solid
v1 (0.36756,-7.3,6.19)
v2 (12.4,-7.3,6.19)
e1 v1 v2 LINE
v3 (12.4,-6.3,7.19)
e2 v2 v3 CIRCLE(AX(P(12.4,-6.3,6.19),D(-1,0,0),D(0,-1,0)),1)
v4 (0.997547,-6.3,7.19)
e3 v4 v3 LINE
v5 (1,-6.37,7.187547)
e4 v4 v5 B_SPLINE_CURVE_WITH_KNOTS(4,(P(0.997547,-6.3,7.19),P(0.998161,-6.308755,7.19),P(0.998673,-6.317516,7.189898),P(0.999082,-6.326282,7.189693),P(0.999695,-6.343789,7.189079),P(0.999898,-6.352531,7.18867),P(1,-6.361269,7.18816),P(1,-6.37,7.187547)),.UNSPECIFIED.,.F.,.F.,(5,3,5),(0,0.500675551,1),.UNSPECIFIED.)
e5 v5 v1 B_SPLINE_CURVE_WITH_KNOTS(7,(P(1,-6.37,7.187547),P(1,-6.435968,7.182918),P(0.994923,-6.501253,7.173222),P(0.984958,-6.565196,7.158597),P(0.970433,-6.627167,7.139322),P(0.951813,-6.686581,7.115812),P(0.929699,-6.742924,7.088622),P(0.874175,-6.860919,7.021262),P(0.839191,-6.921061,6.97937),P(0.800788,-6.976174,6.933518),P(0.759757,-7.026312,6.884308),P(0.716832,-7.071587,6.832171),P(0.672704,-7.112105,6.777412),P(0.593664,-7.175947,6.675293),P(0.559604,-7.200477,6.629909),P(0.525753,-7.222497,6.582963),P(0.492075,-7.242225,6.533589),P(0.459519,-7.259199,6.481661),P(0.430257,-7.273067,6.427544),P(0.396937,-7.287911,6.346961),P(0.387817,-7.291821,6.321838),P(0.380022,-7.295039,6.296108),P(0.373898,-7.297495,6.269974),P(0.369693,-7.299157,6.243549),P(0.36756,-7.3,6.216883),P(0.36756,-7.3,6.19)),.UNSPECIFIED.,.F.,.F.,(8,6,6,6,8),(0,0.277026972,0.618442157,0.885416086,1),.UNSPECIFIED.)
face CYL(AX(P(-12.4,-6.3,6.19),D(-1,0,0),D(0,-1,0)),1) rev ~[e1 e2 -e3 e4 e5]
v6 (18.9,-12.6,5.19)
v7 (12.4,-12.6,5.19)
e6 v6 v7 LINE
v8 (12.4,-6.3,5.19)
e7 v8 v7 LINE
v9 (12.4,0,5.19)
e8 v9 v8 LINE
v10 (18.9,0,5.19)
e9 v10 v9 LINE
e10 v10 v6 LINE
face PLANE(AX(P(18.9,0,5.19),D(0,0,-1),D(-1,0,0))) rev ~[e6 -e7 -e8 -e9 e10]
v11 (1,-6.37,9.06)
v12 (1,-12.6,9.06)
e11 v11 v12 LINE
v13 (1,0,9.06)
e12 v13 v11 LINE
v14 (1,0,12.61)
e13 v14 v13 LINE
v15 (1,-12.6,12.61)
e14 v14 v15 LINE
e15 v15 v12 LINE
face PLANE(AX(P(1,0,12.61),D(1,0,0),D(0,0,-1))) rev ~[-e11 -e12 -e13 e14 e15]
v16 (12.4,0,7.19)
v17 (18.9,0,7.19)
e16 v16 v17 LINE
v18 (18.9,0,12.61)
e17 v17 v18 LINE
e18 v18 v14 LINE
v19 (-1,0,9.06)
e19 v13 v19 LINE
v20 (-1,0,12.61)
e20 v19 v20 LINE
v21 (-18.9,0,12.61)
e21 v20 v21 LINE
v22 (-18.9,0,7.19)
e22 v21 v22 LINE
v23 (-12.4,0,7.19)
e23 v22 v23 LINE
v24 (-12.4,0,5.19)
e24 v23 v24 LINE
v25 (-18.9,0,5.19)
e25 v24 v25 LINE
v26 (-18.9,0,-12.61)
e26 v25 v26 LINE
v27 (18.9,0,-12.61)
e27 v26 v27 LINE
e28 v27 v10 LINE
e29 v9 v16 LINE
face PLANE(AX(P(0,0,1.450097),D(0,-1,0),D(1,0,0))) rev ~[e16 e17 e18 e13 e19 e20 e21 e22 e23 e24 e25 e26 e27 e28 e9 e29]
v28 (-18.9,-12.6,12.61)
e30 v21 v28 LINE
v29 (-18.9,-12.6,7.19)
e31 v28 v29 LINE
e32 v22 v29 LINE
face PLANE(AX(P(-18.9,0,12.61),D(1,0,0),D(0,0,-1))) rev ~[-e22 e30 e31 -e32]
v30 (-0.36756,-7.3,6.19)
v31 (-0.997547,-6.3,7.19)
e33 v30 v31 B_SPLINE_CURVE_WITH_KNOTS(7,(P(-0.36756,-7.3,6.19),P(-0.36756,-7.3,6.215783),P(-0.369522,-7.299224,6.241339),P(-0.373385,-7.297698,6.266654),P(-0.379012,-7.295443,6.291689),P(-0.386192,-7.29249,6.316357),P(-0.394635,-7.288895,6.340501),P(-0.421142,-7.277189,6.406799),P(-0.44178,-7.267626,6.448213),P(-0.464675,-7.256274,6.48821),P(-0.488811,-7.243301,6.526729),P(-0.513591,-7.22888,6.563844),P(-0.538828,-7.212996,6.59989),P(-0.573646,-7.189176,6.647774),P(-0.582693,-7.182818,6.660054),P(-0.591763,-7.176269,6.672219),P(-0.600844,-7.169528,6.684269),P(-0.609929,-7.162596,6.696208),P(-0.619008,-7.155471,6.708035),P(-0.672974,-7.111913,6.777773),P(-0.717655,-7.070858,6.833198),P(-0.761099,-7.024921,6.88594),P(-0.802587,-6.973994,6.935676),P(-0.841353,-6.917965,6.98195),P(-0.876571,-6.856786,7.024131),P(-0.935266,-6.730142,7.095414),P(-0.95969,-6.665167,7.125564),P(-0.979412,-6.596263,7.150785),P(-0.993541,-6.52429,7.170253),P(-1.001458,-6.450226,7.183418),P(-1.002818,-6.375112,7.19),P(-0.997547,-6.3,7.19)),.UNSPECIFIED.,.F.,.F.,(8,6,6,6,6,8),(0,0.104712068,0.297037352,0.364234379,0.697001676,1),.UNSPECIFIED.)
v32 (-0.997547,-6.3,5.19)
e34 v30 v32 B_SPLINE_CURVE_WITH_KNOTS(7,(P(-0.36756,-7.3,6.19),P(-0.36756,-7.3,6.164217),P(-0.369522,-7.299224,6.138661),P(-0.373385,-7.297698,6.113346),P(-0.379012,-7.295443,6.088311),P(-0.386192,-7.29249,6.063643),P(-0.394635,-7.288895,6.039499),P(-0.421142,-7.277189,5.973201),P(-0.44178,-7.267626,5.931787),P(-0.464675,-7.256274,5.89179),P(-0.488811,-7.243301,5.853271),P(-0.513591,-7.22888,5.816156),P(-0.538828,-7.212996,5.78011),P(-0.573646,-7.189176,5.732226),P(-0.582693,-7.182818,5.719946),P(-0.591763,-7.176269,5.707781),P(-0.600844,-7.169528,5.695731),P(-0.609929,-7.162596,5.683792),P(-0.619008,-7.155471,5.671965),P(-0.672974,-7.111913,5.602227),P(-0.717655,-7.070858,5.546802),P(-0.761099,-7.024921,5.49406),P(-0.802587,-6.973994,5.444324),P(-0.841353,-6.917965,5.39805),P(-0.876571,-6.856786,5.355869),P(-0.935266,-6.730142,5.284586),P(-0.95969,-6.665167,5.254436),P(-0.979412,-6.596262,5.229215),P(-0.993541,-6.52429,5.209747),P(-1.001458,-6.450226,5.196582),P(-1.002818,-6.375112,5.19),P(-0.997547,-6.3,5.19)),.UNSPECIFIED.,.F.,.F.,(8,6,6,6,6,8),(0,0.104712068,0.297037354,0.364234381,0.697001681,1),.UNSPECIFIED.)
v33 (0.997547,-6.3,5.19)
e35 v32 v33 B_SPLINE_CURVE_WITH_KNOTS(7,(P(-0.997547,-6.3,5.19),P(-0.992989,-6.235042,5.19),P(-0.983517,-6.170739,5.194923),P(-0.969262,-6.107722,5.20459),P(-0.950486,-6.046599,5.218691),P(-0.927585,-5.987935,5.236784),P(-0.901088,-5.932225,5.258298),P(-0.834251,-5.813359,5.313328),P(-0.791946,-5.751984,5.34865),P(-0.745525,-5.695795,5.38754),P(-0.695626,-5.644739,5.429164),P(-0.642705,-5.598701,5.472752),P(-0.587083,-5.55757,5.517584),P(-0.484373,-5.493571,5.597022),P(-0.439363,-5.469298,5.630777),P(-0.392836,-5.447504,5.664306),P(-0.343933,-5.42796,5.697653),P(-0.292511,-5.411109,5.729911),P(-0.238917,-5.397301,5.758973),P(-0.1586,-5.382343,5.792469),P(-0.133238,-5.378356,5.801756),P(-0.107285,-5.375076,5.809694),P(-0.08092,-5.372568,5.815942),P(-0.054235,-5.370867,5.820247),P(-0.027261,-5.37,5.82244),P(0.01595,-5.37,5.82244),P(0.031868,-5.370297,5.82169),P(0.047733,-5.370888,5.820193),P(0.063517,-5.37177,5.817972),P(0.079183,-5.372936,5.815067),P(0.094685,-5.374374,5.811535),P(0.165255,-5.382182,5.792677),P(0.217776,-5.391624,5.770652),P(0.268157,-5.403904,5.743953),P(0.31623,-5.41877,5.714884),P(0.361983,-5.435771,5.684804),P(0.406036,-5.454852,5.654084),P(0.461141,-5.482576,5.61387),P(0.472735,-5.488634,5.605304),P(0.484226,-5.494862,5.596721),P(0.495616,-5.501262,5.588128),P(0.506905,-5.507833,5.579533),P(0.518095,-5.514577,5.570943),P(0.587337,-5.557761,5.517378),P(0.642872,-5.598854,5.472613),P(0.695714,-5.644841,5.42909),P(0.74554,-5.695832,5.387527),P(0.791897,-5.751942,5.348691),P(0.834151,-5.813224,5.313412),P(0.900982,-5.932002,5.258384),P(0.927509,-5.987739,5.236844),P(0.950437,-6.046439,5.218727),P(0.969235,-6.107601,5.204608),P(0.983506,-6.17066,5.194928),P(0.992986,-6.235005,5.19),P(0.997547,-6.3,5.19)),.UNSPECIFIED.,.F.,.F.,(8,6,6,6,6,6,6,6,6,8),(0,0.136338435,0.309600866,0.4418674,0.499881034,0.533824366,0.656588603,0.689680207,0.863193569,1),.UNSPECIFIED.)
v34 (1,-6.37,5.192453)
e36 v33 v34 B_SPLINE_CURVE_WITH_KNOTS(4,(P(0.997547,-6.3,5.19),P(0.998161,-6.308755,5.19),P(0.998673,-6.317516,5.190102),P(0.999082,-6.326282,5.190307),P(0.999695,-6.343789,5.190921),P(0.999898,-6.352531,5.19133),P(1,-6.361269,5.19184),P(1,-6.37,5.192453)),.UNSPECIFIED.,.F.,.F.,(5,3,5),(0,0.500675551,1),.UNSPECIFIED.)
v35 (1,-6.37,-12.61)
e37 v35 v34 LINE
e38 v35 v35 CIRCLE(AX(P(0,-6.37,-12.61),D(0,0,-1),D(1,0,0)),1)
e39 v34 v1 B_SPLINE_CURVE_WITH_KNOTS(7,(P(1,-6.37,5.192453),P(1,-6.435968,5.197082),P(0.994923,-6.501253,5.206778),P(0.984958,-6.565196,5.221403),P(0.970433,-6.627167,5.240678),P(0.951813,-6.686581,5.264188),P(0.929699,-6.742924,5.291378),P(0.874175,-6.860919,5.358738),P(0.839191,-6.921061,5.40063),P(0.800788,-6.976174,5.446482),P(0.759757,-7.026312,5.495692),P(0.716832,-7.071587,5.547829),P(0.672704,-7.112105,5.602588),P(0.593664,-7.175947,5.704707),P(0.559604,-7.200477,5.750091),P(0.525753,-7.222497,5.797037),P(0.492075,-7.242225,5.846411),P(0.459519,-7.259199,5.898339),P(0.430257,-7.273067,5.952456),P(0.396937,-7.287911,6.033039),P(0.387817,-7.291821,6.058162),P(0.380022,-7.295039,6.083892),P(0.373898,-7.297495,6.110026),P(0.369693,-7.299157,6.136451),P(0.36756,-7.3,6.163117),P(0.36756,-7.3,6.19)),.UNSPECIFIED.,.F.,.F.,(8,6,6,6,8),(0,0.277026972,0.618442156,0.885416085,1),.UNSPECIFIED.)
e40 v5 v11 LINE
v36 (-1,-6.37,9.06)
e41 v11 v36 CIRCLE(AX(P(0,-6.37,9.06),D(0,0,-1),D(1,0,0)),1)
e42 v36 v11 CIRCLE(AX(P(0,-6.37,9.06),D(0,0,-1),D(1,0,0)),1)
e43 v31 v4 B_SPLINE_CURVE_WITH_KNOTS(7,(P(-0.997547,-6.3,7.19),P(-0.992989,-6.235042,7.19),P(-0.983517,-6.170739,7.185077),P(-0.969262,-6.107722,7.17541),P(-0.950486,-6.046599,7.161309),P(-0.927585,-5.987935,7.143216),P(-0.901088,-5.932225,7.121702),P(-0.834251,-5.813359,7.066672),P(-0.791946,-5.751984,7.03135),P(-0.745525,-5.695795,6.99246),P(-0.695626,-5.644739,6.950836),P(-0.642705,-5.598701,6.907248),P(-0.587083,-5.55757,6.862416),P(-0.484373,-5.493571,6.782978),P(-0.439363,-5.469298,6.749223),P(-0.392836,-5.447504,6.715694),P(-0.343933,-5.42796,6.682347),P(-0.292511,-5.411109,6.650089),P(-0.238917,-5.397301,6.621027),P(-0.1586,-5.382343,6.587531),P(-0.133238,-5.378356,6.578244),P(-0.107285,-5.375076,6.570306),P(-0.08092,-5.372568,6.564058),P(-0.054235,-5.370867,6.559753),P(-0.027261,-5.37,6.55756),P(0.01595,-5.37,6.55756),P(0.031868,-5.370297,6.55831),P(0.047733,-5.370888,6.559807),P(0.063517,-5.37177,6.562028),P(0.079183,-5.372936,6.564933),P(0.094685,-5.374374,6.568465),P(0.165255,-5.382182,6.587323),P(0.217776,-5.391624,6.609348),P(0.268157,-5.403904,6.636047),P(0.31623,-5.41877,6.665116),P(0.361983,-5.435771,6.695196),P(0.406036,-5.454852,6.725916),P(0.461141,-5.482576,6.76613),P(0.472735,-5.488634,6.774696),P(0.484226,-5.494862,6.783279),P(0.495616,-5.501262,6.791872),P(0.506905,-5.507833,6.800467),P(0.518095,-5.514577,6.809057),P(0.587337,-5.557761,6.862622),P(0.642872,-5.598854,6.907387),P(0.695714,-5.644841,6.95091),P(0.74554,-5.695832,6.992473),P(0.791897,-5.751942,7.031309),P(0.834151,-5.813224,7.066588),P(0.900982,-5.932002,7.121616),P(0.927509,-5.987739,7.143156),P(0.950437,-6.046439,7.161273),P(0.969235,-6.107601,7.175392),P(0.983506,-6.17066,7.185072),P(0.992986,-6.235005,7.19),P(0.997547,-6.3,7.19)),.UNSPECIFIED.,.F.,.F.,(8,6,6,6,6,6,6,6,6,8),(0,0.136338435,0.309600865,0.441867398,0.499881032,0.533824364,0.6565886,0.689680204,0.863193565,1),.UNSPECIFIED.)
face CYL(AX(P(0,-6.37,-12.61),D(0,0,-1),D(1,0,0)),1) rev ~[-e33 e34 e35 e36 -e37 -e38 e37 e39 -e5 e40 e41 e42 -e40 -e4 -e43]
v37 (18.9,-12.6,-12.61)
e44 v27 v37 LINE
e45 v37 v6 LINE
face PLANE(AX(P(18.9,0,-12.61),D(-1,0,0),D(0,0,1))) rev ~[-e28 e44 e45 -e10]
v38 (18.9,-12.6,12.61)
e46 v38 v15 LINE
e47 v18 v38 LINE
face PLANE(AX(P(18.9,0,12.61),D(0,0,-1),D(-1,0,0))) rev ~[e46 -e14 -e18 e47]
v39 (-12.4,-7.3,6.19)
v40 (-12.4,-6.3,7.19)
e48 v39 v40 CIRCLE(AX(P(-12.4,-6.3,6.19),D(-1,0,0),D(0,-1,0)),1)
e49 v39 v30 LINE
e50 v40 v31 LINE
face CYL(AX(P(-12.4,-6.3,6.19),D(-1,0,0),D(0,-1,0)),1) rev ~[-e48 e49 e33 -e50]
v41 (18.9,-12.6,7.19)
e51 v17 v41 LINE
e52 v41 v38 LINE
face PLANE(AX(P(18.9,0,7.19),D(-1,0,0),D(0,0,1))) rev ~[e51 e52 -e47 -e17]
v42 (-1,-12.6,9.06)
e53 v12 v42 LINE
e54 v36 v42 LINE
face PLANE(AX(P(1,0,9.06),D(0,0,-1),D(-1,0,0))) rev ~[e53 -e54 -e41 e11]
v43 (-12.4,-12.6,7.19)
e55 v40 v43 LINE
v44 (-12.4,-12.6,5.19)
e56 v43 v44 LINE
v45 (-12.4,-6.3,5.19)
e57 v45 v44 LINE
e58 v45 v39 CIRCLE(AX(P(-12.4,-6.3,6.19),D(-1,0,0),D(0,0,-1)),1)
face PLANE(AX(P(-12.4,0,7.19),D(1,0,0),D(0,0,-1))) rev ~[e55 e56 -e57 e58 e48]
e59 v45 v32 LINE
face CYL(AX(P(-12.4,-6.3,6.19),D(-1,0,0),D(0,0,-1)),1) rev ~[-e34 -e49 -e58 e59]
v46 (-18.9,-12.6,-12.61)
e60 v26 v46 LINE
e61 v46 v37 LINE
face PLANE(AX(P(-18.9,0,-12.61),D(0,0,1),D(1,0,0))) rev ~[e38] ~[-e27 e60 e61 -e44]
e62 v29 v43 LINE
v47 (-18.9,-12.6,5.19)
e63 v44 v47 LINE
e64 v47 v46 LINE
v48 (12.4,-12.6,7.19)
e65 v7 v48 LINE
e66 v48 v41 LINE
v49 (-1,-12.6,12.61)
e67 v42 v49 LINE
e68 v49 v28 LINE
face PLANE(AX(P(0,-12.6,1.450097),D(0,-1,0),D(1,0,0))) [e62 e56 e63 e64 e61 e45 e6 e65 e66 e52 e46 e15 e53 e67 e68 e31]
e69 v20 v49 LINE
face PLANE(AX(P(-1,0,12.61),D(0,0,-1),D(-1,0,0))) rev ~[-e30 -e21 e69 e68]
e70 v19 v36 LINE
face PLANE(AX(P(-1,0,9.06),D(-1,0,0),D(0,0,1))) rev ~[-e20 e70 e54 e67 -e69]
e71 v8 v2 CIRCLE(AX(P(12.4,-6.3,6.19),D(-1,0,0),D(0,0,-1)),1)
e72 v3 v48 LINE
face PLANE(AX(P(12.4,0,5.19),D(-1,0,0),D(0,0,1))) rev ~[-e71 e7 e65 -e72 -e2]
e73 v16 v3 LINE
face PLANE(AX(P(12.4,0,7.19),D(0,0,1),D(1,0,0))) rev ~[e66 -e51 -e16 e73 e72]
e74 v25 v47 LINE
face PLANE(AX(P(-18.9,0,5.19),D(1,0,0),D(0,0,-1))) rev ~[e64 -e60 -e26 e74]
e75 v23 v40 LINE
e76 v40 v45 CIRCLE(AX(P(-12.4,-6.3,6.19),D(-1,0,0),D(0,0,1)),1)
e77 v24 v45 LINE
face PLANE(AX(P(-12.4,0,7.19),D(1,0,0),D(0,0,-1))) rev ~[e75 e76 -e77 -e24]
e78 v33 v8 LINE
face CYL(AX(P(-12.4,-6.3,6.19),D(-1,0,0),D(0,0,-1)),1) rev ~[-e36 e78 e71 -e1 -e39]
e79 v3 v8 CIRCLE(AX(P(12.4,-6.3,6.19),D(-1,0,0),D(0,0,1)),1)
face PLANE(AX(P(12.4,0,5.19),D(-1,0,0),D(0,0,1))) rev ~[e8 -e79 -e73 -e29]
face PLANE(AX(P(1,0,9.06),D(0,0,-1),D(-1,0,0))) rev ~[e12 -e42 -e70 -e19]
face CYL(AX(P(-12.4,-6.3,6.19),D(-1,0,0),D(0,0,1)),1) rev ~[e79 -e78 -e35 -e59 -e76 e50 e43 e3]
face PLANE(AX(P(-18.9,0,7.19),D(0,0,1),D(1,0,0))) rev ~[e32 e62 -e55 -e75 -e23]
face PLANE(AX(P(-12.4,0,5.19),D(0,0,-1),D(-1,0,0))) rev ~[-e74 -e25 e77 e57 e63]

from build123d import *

# Parameters (mm, degrees)
F1_DEPTH = 12.6
F2_R     = 1
F3_DEPTH = 22
F5_DEPTH = 31.301


# Not quite as in the source:
# - a feature names something its author has since deleted; it is built from what else it names


with BuildPart() as f1:
    # F0 (on Front) → F1 (new body)
    with BuildSketch(Plane.XZ):
        Polygon((-1, 12.61), (-18.9, 12.61), (-18.9, 7.19), (-12.4, 7.19), (-12.4, 5.19), (-18.9, 5.19), (-18.9, -12.61), (18.9, -12.61), (18.9, 5.19), (12.4, 5.19), (12.4, 7.19), (18.9, 7.19), (18.9, 12.61), (1, 12.61), (1, 9.06), (0, 9.06), (-1, 9.06), align=None)
    extrude(amount=F1_DEPTH)

    # F2 (on face) → F3 (cut)
    with BuildSketch(Plane(origin=(0, 0, -12.61), x_dir=(1, 0, 0), z_dir=(0, 0, -1))):
        with Locations((0, 6.37)):
            Circle(F2_R)
    extrude(amount=-F3_DEPTH, mode=Mode.SUBTRACT)

    # F4 (on face) → F5 (cut, through all)
    with BuildSketch(Plane(origin=(-12.4, 0, 0), x_dir=(0, -1, 0), z_dir=(-1, 0, 0))):
        with BuildLine():
            ThreePointArc((6.3, 5.19), (7.0071067812, 5.4828932188), (7.3, 6.19))
            ThreePointArc((7.3, 6.19), (7.0071067812, 6.8971067812), (6.3, 7.19))
            ThreePointArc((6.3, 7.19), (5.3, 6.19), (6.3, 5.19))
        make_face()
    extrude(amount=-F5_DEPTH, mode=Mode.SUBTRACT)


solid = f1.part
